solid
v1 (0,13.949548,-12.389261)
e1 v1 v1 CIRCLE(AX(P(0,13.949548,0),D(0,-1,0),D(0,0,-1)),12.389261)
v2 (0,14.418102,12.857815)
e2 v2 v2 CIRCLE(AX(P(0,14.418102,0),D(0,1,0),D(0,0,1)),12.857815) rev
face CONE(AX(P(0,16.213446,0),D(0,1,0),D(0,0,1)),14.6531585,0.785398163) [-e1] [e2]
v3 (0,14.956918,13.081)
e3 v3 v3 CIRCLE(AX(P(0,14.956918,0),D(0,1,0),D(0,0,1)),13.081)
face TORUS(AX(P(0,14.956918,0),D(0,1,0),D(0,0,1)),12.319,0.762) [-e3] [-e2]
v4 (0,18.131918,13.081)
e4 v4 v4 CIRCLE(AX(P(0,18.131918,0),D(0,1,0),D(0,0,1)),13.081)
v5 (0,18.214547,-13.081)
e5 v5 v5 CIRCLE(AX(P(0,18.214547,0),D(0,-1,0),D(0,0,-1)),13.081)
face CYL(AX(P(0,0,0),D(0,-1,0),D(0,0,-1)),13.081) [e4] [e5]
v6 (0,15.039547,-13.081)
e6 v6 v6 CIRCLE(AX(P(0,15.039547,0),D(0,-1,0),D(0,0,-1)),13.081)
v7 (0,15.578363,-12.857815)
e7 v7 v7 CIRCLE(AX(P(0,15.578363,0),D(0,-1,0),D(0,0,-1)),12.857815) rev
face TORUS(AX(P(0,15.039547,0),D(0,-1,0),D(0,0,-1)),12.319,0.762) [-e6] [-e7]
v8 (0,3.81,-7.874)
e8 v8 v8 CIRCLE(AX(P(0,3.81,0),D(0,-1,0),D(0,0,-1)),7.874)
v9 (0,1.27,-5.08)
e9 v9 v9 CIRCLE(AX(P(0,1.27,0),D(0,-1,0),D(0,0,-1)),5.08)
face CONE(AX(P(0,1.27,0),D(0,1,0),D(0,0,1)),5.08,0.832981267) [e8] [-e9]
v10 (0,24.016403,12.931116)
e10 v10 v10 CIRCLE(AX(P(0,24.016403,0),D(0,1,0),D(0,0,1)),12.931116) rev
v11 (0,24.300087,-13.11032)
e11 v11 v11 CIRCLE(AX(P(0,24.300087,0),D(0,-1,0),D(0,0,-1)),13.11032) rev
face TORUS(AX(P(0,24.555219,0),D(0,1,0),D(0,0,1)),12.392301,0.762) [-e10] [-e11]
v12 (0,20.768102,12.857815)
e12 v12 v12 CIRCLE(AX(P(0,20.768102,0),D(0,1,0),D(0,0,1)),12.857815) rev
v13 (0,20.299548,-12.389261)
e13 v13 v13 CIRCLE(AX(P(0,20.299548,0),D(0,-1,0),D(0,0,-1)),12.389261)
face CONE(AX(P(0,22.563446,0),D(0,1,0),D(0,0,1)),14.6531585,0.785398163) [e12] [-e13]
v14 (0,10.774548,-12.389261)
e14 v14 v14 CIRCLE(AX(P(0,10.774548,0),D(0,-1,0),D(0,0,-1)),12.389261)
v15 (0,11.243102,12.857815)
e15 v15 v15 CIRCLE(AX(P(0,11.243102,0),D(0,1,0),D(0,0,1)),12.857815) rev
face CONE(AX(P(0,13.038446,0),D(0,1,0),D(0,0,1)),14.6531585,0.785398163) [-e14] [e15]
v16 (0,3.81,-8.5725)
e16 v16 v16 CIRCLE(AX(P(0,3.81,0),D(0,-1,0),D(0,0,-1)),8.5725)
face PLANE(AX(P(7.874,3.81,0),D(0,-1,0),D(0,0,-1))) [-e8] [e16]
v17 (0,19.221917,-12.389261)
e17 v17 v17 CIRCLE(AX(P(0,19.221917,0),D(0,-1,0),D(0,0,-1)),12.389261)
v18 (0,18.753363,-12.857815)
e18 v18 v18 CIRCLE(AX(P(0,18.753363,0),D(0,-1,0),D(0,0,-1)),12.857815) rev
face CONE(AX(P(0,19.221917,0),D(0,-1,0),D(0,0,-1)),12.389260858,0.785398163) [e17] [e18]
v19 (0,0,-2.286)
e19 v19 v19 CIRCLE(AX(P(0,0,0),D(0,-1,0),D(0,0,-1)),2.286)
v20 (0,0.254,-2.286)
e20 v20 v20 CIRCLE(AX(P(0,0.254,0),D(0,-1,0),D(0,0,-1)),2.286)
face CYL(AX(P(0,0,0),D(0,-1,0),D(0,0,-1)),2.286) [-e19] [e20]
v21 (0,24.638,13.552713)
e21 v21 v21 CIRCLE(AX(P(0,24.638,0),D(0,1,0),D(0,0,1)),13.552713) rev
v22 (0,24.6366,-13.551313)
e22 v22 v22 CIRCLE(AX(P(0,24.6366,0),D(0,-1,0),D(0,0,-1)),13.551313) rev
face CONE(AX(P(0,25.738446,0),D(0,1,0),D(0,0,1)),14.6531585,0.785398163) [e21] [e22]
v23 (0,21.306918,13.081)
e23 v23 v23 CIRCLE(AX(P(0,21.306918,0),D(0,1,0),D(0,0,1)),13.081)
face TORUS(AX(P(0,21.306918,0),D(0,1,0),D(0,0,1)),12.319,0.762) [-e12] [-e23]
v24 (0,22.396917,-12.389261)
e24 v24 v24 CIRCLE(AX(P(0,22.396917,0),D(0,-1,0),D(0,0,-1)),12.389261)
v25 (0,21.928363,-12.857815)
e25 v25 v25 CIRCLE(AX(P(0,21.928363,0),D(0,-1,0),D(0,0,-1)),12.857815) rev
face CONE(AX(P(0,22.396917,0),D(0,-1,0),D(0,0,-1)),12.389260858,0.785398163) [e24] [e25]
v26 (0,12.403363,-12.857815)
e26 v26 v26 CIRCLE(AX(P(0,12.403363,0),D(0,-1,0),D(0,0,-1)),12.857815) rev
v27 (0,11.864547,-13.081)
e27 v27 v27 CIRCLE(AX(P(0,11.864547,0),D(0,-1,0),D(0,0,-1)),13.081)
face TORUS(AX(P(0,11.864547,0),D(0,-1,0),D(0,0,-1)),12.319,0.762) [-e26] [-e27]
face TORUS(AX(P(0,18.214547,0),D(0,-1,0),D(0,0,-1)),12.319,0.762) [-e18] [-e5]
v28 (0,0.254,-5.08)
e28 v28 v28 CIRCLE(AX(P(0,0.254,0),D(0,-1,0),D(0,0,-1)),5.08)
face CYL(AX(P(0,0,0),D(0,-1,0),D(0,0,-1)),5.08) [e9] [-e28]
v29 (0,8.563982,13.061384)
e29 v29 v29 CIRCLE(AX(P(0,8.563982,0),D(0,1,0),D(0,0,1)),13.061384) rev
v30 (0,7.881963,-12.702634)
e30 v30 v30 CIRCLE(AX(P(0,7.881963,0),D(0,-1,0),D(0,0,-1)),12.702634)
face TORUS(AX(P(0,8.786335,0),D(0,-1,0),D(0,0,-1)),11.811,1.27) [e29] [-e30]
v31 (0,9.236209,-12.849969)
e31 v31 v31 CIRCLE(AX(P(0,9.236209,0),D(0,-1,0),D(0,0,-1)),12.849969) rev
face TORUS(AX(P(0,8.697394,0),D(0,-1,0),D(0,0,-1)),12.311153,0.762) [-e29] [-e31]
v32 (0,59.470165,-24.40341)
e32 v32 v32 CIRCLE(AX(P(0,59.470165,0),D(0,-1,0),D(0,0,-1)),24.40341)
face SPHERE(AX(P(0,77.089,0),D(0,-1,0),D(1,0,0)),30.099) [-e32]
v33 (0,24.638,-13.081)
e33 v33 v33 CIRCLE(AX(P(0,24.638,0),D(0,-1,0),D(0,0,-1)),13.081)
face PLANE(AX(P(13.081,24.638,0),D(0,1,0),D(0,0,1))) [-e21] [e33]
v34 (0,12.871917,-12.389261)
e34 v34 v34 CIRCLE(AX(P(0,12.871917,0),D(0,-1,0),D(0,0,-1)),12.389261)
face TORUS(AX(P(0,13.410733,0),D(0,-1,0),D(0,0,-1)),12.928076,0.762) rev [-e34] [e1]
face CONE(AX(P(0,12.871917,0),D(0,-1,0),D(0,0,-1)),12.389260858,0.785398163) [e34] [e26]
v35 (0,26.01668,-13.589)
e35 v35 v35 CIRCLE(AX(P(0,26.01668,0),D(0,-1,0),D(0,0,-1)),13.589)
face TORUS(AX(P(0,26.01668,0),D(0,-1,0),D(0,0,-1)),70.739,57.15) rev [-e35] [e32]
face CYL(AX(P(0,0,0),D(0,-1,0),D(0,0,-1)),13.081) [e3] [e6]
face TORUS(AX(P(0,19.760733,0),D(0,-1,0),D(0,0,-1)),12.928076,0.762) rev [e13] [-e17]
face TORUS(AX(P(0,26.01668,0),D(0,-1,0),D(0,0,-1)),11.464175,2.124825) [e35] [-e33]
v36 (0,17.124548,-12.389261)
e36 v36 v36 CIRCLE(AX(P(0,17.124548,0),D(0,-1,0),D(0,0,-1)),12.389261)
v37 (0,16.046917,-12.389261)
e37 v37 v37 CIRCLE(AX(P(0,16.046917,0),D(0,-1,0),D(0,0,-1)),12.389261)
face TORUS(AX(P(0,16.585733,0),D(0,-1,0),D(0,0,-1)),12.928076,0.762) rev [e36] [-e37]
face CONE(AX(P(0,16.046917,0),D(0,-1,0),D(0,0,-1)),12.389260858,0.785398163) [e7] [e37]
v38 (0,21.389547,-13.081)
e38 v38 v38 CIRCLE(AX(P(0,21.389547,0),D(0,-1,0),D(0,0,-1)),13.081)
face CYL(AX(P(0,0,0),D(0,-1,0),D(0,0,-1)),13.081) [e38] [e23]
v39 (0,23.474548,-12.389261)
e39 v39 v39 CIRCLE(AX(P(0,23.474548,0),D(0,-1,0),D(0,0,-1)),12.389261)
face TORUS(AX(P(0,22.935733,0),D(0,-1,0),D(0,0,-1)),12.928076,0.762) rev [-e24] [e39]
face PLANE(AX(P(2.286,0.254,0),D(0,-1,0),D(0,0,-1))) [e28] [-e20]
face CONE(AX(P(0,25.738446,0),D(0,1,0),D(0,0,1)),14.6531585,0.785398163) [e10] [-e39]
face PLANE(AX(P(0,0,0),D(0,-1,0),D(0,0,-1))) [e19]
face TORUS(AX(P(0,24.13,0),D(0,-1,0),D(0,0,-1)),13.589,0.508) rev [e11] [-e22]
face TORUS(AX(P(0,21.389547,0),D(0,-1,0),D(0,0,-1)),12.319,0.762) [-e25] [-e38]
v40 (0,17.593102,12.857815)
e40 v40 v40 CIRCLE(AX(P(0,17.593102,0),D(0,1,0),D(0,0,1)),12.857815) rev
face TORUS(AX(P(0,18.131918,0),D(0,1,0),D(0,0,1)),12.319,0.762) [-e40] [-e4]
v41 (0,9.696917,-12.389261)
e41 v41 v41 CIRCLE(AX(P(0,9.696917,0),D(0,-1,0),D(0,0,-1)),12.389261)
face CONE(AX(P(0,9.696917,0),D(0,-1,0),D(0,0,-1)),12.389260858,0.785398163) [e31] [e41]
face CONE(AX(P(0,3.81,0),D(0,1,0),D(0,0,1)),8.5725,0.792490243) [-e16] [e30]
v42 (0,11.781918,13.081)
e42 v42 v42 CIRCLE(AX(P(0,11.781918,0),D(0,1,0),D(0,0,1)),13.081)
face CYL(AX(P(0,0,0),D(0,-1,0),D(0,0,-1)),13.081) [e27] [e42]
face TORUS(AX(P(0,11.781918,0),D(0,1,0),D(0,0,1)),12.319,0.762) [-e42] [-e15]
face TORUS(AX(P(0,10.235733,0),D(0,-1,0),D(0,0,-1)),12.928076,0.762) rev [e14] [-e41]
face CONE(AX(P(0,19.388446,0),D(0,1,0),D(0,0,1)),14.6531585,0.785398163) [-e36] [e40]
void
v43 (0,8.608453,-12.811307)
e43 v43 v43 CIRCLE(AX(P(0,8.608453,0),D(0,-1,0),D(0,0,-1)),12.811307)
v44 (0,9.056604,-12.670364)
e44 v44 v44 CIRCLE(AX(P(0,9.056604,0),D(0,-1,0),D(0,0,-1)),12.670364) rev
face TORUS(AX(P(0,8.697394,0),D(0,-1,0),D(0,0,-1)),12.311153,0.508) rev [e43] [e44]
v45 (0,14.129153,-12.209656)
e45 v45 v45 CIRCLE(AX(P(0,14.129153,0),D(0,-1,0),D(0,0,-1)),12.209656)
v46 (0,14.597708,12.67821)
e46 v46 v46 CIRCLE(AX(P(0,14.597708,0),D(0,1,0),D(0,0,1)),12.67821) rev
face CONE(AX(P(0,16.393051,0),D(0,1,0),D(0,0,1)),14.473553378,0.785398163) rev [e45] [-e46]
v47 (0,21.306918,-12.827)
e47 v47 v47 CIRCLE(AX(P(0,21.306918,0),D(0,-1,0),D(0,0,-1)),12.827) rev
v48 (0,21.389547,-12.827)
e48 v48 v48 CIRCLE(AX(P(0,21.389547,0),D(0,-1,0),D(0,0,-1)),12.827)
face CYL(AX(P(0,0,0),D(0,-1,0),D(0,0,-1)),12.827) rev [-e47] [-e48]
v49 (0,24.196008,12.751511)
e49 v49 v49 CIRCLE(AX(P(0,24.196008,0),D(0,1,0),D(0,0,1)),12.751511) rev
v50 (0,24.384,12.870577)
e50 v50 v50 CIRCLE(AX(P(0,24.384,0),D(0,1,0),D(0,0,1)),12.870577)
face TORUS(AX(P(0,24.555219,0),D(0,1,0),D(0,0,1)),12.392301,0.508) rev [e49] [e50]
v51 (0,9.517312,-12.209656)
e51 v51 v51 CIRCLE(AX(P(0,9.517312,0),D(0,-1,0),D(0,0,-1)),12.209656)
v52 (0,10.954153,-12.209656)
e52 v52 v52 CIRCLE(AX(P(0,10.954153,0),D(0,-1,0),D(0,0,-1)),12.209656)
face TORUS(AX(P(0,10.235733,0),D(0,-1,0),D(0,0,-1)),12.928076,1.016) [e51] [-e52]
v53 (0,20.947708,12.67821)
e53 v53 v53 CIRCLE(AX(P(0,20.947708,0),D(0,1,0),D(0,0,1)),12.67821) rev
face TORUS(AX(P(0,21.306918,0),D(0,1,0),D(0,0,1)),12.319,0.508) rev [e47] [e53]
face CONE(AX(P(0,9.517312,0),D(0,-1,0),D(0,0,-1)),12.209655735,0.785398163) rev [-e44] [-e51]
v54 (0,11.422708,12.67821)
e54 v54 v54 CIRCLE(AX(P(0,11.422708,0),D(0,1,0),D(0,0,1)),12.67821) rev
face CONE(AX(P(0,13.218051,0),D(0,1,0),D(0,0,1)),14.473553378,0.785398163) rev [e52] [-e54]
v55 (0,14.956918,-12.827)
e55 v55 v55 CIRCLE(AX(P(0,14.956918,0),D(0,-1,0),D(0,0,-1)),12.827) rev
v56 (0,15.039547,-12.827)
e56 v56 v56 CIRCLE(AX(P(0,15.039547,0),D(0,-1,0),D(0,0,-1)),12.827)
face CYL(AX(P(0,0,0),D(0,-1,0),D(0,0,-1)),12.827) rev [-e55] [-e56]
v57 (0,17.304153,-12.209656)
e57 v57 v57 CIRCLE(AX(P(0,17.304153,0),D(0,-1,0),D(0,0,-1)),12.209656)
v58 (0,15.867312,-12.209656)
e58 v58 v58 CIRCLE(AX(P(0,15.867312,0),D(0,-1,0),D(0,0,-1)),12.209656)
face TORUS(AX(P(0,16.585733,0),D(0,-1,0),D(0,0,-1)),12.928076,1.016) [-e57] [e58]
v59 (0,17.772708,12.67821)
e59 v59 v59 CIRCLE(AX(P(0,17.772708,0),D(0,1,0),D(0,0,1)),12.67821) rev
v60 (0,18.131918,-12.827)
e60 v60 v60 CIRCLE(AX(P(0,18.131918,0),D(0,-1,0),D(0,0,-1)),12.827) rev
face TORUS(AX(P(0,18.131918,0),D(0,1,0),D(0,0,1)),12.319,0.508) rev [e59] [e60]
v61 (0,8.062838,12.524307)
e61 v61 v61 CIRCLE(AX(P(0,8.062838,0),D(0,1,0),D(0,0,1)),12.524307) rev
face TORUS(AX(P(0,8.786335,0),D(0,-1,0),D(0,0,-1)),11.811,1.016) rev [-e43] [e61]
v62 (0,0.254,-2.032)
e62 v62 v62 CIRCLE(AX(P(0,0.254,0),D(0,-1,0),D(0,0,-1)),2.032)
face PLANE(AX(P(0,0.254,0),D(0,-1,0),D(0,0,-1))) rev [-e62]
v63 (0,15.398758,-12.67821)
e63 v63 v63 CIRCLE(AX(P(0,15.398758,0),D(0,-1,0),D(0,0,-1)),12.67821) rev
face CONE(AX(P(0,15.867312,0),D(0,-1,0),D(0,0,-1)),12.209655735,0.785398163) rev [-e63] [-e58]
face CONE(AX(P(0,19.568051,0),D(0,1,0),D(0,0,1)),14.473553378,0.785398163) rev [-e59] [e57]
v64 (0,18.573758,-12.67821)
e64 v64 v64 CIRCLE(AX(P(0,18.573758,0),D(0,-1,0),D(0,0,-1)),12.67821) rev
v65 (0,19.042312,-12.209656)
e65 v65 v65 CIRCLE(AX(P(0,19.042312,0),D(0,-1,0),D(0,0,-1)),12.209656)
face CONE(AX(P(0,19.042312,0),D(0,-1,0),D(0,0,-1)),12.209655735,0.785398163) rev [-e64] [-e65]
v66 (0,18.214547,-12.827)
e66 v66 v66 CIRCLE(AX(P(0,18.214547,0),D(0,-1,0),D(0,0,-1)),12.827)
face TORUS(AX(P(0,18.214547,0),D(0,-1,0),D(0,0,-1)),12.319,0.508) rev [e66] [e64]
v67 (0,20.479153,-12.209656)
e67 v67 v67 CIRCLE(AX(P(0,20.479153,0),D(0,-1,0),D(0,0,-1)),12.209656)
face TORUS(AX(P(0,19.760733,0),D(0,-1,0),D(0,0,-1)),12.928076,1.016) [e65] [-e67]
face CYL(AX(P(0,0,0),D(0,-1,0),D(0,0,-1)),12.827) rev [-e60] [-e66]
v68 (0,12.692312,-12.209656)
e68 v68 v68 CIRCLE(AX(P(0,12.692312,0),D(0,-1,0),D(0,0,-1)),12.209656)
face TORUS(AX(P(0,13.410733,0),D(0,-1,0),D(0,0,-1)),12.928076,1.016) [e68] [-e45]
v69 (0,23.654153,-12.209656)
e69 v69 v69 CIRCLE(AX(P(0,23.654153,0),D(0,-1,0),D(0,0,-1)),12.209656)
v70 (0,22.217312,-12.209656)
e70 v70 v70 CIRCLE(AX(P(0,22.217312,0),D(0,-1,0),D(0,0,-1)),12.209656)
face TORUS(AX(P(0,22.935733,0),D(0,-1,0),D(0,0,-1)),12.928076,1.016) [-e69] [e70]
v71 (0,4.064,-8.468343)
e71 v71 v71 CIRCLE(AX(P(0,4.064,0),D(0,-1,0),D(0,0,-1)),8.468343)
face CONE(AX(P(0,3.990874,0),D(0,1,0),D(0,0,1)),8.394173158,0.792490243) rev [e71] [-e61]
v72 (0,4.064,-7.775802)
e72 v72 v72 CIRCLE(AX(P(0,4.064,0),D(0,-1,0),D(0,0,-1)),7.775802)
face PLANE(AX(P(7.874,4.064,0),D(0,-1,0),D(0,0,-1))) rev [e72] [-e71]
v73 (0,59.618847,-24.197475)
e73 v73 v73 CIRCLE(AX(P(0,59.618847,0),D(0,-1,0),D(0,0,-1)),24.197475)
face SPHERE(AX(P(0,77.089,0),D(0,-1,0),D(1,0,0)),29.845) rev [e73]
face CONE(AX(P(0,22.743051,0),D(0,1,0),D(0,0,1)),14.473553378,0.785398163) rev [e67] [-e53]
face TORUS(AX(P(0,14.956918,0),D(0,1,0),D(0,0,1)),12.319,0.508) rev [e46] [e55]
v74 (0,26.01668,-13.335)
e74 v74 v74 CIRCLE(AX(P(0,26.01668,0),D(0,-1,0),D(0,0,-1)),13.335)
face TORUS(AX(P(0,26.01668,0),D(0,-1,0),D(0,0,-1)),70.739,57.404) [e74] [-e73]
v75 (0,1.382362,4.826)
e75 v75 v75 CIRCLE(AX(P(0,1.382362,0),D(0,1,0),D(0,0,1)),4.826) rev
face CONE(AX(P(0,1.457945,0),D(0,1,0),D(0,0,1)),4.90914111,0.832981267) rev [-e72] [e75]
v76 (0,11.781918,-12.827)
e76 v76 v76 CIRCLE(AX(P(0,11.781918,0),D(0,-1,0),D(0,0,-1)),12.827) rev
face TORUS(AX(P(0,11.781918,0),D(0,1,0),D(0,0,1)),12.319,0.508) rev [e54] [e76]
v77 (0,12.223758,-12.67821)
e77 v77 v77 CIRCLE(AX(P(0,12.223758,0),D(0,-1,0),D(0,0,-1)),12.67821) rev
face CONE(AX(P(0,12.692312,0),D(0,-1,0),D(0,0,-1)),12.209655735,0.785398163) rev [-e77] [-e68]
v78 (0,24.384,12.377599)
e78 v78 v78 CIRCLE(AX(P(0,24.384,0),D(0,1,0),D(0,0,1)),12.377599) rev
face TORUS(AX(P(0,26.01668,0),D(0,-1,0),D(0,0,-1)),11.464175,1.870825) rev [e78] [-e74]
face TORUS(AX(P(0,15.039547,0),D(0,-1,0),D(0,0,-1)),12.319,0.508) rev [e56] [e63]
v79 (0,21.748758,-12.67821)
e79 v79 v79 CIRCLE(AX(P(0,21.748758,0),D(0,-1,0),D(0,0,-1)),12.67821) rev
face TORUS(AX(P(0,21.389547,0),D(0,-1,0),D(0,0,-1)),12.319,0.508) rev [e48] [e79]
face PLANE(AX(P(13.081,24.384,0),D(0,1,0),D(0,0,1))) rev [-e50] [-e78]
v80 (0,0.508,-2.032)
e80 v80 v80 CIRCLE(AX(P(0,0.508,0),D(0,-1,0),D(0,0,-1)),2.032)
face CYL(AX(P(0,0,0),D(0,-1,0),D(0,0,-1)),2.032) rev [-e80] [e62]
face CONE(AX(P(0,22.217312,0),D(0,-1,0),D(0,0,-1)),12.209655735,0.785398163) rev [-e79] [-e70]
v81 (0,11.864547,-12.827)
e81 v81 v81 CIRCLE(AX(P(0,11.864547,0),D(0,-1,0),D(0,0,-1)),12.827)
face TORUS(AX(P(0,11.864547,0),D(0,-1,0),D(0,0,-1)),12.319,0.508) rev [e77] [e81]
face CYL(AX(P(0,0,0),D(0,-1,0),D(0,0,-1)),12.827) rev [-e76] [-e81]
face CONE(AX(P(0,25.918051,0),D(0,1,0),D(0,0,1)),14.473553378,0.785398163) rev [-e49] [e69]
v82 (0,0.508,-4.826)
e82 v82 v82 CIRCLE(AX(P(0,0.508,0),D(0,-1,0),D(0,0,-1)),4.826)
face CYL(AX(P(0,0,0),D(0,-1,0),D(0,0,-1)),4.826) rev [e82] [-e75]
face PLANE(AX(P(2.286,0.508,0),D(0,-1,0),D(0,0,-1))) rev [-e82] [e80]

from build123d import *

# Parameters (mm, degrees)
LPATTERN1_COUNT = 5
LPATTERN1_PITCH = 3.175
FILLET1_R       = 0.762


# Read off the part's stored shape, not the designer's step: Shell1
with BuildPart() as part:
    # Sketch1 → Revolve1 (revolve)
    with BuildSketch(Plane.XY, mode=Mode.PRIVATE) as revolve1_sk:
        with BuildLine():
            Line((0, 0), (0, 107.18799999999999))
            ThreePointArc((0, 107.18799999999999), (26.797939521597456, 90.79375240187885), (24.403410480349333, 59.47016468299973))
            ThreePointArc((24.403410480349333, 59.47016468299973), (16.359769401139758, 43.5956952197664), (13.588999999999997, 26.016679903885294))
            ThreePointArc((13.588999999999997, 26.016679903885294), (13.457959273997682, 25.28203334305193), (13.080999999999996, 24.638))
            Line((13.080999999999996, 24.638), (13.588999999999995, 24.638))
            ThreePointArc((13.588999999999995, 24.638), (13.22978975515723, 24.489210244842766), (13.080999999999996, 24.13))
            Line((13.080999999999996, 24.13), (13.081, 8.786335151479129))
            ThreePointArc((13.081, 8.786335151479129), (12.982596229384008, 8.29616959241446), (12.702634212136727, 7.881963307740435))
            Line((12.702634212136727, 7.881963307740435), (8.572499999999998, 3.8099999999999996))
            Line((8.572499999999998, 3.8099999999999996), (7.873999999999999, 3.81))
            Line((7.873999999999999, 3.81), (5.08, 1.2699999999999994))
            Line((5.08, 1.2699999999999994), (5.08, 0.254))
            Line((5.08, 0.254), (2.286, 0.254))
            Line((2.286, 0.254), (2.286, 0))
            Line((2.286, 0), (0, 0))
        make_face()
    revolve(revolve1_sk.sketch.rotate(Axis((0, 0, 0), (0, 1, 0)), 90), axis=Axis((0, 0, 0), (0, 1, 0)))

    # Sketch2 → Cut-Revolve1 (revolve, cut)
    with BuildSketch(Plane.XY, mode=Mode.PRIVATE) as cut_revolve1_sk:
        with BuildLine():
            Line((14.653158500010424, 13.038445628078424), (14.653158500010424, 7.433019608930639))
            Line((14.653158500010424, 7.433019608930639), (12.389260857700682, 9.69691725124038))
            ThreePointArc((12.389260857700682, 9.69691725124038), (12.166076224964831, 10.235732618504532), (12.389260857700682, 10.774547985768683))
            Line((12.389260857700682, 10.774547985768683), (14.653158500010424, 13.038445628078424))
        make_face()
    cut_revolve1 = revolve(cut_revolve1_sk.sketch.rotate(Axis((0, 0, 0), (0, 1, 0)), 90), axis=Axis((0, 0, 0), (0, 1, 0)), mode=Mode.SUBTRACT)

    # LPattern1: Cut-Revolve1 ×5
    with Locations(*[(0, i * LPATTERN1_PITCH, 0) for i in range(1, LPATTERN1_COUNT)]):
        add(cut_revolve1, mode=Mode.SUBTRACT)

    # Fillet1
    # the kernel refuses this fillet: 0.762 mm, written as the material it takes off along each edge
    with BuildSketch(Plane(origin=(0, 20.991287128067995, 0), x_dir=(1.1e-16, 0, -1), z_dir=(-1, 0, -1.1e-16))) as fillet1_piece_1:
        with BuildLine():
            CenterArc((13.080999999999996 - FILLET1_R, -FILLET1_R * 0.414213562373), FILLET1_R, 0, 45)
            Line((13.080999999999996 - FILLET1_R * 0.292893218813, FILLET1_R * 0.292893218813), (13.080999999999996, 0))
            Line((13.080999999999996, 0), (13.080999999999996, -FILLET1_R * 0.414213562373))
        make_face()
    revolve(axis=Axis((0, 20.991287128067995, 0), (0, -1, 0)), mode=Mode.SUBTRACT)
    with BuildSketch(Plane(origin=(0, 21.70517810894107, 0), x_dir=(1.1e-16, 0, -1), z_dir=(-1, 0, -1.1e-16))) as fillet1_piece_2:
        with BuildLine():
            CenterArc((13.080999999999996 - FILLET1_R, FILLET1_R * 0.414213562373), FILLET1_R, 315, 45)
            Line((13.080999999999994, FILLET1_R * 0.414213562373), (13.080999999999996, 0))
            Line((13.080999999999996, 0), (13.080999999999996 - FILLET1_R * 0.292893218813, -FILLET1_R * 0.292893218813))
        make_face()
    revolve(axis=Axis((0, 21.70517810894107, 0), (0, -1, 0)), mode=Mode.SUBTRACT)
    with BuildSketch(Plane(origin=(0, 17.816287128067998, 0), x_dir=(1.1e-16, 0, -1), z_dir=(-1, 0, -1.1e-16))) as fillet1_piece_3:
        with BuildLine():
            CenterArc((13.080999999999996 - FILLET1_R, -FILLET1_R * 0.414213562373), FILLET1_R, 0, 45)
            Line((13.080999999999996 - FILLET1_R * 0.292893218813, FILLET1_R * 0.292893218813), (13.080999999999996, 0))
            Line((13.080999999999996, 0), (13.080999999999996, -FILLET1_R * 0.414213562373))
        make_face()
    revolve(axis=Axis((0, 17.816287128067998, 0), (0, -1, 0)), mode=Mode.SUBTRACT)
    with BuildSketch(Plane(origin=(0, 18.530178108941065, 0), x_dir=(1.1e-16, 0, -1), z_dir=(-1, 0, -1.1e-16))) as fillet1_piece_4:
        with BuildLine():
            CenterArc((13.080999999999996 - FILLET1_R, FILLET1_R * 0.414213562373), FILLET1_R, 315, 45)
            Line((13.080999999999996, FILLET1_R * 0.414213562373), (13.080999999999996, 0))
            Line((13.080999999999996, 0), (13.080999999999996 - FILLET1_R * 0.292893218813, -FILLET1_R * 0.292893218813))
        make_face()
    revolve(axis=Axis((0, 18.530178108941065, 0), (0, -1, 0)), mode=Mode.SUBTRACT)
    with BuildSketch(Plane(origin=(0, 14.641287128067995, 0), x_dir=(1.1e-16, 0, -1), z_dir=(-1, 0, -1.1e-16))) as fillet1_piece_5:
        with BuildLine():
            CenterArc((13.080999999999996 - FILLET1_R, -FILLET1_R * 0.414213562373), FILLET1_R, 0, 45)
            Line((13.080999999999996 - FILLET1_R * 0.292893218813, FILLET1_R * 0.292893218813), (13.080999999999996, 0))
            Line((13.080999999999996, 0), (13.080999999999996, -FILLET1_R * 0.414213562373))
        make_face()
    revolve(axis=Axis((0, 14.641287128067995, 0), (0, -1, 0)), mode=Mode.SUBTRACT)
    with BuildSketch(Plane(origin=(0, 15.355178108941066, 0), x_dir=(1.1e-16, 0, -1), z_dir=(-1, 0, -1.1e-16))) as fillet1_piece_6:
        with BuildLine():
            CenterArc((13.080999999999996 - FILLET1_R, FILLET1_R * 0.414213562373), FILLET1_R, 315, 45)
            Line((13.080999999999996, FILLET1_R * 0.414213562373), (13.080999999999996, 0))
            Line((13.080999999999996, 0), (13.080999999999996 - FILLET1_R * 0.292893218813, -FILLET1_R * 0.292893218813))
        make_face()
    revolve(axis=Axis((0, 15.355178108941066, 0), (0, -1, 0)), mode=Mode.SUBTRACT)
    with BuildSketch(Plane(origin=(0, 11.466287128067997, 0), x_dir=(1.1e-16, 0, -1), z_dir=(-1, 0, -1.1e-16))) as fillet1_piece_7:
        with BuildLine():
            CenterArc((13.080999999999996 - FILLET1_R, -FILLET1_R * 0.414213562373), FILLET1_R, 0, 45)
            Line((13.080999999999996 - FILLET1_R * 0.292893218813, FILLET1_R * 0.292893218813), (13.080999999999996, 0))
            Line((13.080999999999996, 0), (13.080999999999996, -FILLET1_R * 0.414213562373))
        make_face()
    revolve(axis=Axis((0, 11.466287128067997, 0), (0, -1, 0)), mode=Mode.SUBTRACT)
    with BuildSketch(Plane(origin=(0, 12.18017810894107, 0), x_dir=(1.1e-16, 0, -1), z_dir=(-1, 0, -1.1e-16))) as fillet1_piece_8:
        with BuildLine():
            CenterArc((13.080999999999996 - FILLET1_R, FILLET1_R * 0.414213562373), FILLET1_R, 315, 44.999999999999865)
            Line((13.080999999999996, FILLET1_R * 0.414213562373), (13.080999999999996, 0))
            Line((13.080999999999996, 0), (13.080999999999996 - FILLET1_R * 0.292893218813, -FILLET1_R * 0.292893218813))
        make_face()
    revolve(axis=Axis((0, 12.18017810894107, 0), (0, -1, 0)), mode=Mode.SUBTRACT)
    with BuildSketch(Plane(origin=(0, 9.005178108941065, 0), x_dir=(1.1e-16, 0, -1), z_dir=(-1, 0, -1.1e-16))) as fillet1_piece_9:
        with BuildLine():
            CenterArc((12.31115343692058, 0.3077841714488798), FILLET1_R, 315, 55.083379399186136)
            Line((13.061383592288468, 0.441195992426918), (13.136406607825258, 0.454537174524722))
            ThreePointArc((13.136406607825258, 0.454537174524722), (13.1572, 0.21884295746193594), (13.157199999999996, 0))
            Line((13.157199999999996, 0), (13.134881536726411, -0.05388153672641494))
            Line((13.134881536726411, -0.05388153672641494), (12.903850340911145, -0.2849127325416845))
            Line((12.903850340911145, -0.2849127325416845), (12.84996880418473, -0.23103119581526954))
        make_face()
    revolve(axis=Axis((0, 9.005178108941065, 0), (0, -1, 0)), mode=Mode.SUBTRACT)
    with BuildSketch(Plane(origin=(0, 24.167686999709446, 0), x_dir=(1.2e-16, 0, -1), z_dir=(1, 0, 1.2e-16))) as fillet1_piece_10:
        with BuildLine():
            CenterArc((12.392300726311051, 0.38753158919789854), FILLET1_R, 314.9999999999999, 25.438541977538648)
            Line((12.931116093575199, -0.15128377806625082), (13.082399871641444, 0))
            ThreePointArc((13.082399871641444, 0), (13.091932038284336, 0.06713399740391779), (13.110320290524417, 0.1324004358534907))
        make_face()
    revolve(axis=Axis((0, 24.167686999709446, 0), (0, 1, 0)), mode=Mode.SUBTRACT)

    # Shell1 outline → Shell1 (revolve, cut)
    with BuildSketch(Plane.XY):
        with BuildLine():
            ThreePointArc((12.377598592, 24.384), (13.077996842, 25.070336794), (13.335, 26.016679904))
            ThreePointArc((13.335, 26.016679904), (16.118083932, 43.673824177), (24.197474527, 59.618846838))
            ThreePointArc((24.197474527, 59.618846838), (26.571796576, 90.678100476), (0, 106.934))
            Line((0, 106.934), (0, 0.254))
            Line((0, 0.254), (2.032, 0.254))
            Line((2.032, 0.254), (2.032, 0.508))
            Line((2.032, 0.508), (4.826, 0.508))
            Line((4.826, 0.508), (4.826, 1.382361951))
            Line((4.826, 1.382361951), (7.775801854, 4.064))
            Line((7.775801854, 4.064), (8.468343441, 4.064))
            Line((8.468343441, 4.064), (12.52430737, 8.062837676))
            ThreePointArc((12.52430737, 8.062837676), (12.710189851, 8.313351419), (12.811306874, 8.608452724))
            ThreePointArc((12.811306874, 8.608452724), (12.79575267, 8.849799919), (12.670363682, 9.056604182))
            Line((12.670363682, 9.056604182), (12.209655735, 9.517312129))
            ThreePointArc((12.209655735, 9.517312129), (11.912076225, 10.235732619), (12.209655735, 10.954153108))
            Line((12.209655735, 10.954153108), (12.678210245, 11.422707618))
            ThreePointArc((12.678210245, 11.422707618), (12.788330803, 11.587514679), (12.827, 11.781917863))
            Line((12.827, 11.781917863), (12.827, 11.864547374))
            ThreePointArc((12.827, 11.864547374), (12.788330803, 12.058950558), (12.678210245, 12.223757619))
            Line((12.678210245, 12.223757619), (12.209655735, 12.692312129))
            ThreePointArc((12.209655735, 12.692312129), (11.912076225, 13.410732618), (12.209655735, 14.129153108))
            Line((12.209655735, 14.129153108), (12.678210245, 14.597707618))
            ThreePointArc((12.678210245, 14.597707618), (12.788330803, 14.762514679), (12.827, 14.956917863))
            Line((12.827, 14.956917863), (12.827, 15.039547374))
            ThreePointArc((12.827, 15.039547374), (12.788330803, 15.233950558), (12.678210245, 15.398757619))
            Line((12.678210245, 15.398757619), (12.209655735, 15.867312129))
            ThreePointArc((12.209655735, 15.867312129), (11.912076225, 16.585732618), (12.209655735, 17.304153108))
            Line((12.209655735, 17.304153108), (12.678210245, 17.772707618))
            ThreePointArc((12.678210245, 17.772707618), (12.788330803, 17.937514679), (12.827, 18.131917863))
            Line((12.827, 18.131917863), (12.827, 18.214547374))
            ThreePointArc((12.827, 18.214547374), (12.788330803, 18.408950558), (12.678210245, 18.573757619))
            Line((12.678210245, 18.573757619), (12.209655735, 19.042312129))
            ThreePointArc((12.209655735, 19.042312129), (11.912076225, 19.760732619), (12.209655735, 20.479153108))
            Line((12.209655735, 20.479153108), (12.678210245, 20.947707618))
            ThreePointArc((12.678210245, 20.947707618), (12.788330803, 21.112514679), (12.827, 21.306917863))
            Line((12.827, 21.306917863), (12.827, 21.389547374))
            ThreePointArc((12.827, 21.389547374), (12.788330803, 21.583950558), (12.678210245, 21.748757619))
            Line((12.678210245, 21.748757619), (12.209655735, 22.217312129))
            ThreePointArc((12.209655735, 22.217312129), (11.912076225, 22.935732618), (12.209655735, 23.654153108))
            Line((12.209655735, 23.654153108), (12.751510971, 24.196008344))
            ThreePointArc((12.751510971, 24.196008344), (12.821464021, 24.283404559), (12.870577001, 24.384))
            Line((12.870577001, 24.384), (12.377598592, 24.384))
        make_face()
    revolve(axis=Axis((0, 0, 0), (0, 1, 0)), mode=Mode.SUBTRACT)


solid = part.part
